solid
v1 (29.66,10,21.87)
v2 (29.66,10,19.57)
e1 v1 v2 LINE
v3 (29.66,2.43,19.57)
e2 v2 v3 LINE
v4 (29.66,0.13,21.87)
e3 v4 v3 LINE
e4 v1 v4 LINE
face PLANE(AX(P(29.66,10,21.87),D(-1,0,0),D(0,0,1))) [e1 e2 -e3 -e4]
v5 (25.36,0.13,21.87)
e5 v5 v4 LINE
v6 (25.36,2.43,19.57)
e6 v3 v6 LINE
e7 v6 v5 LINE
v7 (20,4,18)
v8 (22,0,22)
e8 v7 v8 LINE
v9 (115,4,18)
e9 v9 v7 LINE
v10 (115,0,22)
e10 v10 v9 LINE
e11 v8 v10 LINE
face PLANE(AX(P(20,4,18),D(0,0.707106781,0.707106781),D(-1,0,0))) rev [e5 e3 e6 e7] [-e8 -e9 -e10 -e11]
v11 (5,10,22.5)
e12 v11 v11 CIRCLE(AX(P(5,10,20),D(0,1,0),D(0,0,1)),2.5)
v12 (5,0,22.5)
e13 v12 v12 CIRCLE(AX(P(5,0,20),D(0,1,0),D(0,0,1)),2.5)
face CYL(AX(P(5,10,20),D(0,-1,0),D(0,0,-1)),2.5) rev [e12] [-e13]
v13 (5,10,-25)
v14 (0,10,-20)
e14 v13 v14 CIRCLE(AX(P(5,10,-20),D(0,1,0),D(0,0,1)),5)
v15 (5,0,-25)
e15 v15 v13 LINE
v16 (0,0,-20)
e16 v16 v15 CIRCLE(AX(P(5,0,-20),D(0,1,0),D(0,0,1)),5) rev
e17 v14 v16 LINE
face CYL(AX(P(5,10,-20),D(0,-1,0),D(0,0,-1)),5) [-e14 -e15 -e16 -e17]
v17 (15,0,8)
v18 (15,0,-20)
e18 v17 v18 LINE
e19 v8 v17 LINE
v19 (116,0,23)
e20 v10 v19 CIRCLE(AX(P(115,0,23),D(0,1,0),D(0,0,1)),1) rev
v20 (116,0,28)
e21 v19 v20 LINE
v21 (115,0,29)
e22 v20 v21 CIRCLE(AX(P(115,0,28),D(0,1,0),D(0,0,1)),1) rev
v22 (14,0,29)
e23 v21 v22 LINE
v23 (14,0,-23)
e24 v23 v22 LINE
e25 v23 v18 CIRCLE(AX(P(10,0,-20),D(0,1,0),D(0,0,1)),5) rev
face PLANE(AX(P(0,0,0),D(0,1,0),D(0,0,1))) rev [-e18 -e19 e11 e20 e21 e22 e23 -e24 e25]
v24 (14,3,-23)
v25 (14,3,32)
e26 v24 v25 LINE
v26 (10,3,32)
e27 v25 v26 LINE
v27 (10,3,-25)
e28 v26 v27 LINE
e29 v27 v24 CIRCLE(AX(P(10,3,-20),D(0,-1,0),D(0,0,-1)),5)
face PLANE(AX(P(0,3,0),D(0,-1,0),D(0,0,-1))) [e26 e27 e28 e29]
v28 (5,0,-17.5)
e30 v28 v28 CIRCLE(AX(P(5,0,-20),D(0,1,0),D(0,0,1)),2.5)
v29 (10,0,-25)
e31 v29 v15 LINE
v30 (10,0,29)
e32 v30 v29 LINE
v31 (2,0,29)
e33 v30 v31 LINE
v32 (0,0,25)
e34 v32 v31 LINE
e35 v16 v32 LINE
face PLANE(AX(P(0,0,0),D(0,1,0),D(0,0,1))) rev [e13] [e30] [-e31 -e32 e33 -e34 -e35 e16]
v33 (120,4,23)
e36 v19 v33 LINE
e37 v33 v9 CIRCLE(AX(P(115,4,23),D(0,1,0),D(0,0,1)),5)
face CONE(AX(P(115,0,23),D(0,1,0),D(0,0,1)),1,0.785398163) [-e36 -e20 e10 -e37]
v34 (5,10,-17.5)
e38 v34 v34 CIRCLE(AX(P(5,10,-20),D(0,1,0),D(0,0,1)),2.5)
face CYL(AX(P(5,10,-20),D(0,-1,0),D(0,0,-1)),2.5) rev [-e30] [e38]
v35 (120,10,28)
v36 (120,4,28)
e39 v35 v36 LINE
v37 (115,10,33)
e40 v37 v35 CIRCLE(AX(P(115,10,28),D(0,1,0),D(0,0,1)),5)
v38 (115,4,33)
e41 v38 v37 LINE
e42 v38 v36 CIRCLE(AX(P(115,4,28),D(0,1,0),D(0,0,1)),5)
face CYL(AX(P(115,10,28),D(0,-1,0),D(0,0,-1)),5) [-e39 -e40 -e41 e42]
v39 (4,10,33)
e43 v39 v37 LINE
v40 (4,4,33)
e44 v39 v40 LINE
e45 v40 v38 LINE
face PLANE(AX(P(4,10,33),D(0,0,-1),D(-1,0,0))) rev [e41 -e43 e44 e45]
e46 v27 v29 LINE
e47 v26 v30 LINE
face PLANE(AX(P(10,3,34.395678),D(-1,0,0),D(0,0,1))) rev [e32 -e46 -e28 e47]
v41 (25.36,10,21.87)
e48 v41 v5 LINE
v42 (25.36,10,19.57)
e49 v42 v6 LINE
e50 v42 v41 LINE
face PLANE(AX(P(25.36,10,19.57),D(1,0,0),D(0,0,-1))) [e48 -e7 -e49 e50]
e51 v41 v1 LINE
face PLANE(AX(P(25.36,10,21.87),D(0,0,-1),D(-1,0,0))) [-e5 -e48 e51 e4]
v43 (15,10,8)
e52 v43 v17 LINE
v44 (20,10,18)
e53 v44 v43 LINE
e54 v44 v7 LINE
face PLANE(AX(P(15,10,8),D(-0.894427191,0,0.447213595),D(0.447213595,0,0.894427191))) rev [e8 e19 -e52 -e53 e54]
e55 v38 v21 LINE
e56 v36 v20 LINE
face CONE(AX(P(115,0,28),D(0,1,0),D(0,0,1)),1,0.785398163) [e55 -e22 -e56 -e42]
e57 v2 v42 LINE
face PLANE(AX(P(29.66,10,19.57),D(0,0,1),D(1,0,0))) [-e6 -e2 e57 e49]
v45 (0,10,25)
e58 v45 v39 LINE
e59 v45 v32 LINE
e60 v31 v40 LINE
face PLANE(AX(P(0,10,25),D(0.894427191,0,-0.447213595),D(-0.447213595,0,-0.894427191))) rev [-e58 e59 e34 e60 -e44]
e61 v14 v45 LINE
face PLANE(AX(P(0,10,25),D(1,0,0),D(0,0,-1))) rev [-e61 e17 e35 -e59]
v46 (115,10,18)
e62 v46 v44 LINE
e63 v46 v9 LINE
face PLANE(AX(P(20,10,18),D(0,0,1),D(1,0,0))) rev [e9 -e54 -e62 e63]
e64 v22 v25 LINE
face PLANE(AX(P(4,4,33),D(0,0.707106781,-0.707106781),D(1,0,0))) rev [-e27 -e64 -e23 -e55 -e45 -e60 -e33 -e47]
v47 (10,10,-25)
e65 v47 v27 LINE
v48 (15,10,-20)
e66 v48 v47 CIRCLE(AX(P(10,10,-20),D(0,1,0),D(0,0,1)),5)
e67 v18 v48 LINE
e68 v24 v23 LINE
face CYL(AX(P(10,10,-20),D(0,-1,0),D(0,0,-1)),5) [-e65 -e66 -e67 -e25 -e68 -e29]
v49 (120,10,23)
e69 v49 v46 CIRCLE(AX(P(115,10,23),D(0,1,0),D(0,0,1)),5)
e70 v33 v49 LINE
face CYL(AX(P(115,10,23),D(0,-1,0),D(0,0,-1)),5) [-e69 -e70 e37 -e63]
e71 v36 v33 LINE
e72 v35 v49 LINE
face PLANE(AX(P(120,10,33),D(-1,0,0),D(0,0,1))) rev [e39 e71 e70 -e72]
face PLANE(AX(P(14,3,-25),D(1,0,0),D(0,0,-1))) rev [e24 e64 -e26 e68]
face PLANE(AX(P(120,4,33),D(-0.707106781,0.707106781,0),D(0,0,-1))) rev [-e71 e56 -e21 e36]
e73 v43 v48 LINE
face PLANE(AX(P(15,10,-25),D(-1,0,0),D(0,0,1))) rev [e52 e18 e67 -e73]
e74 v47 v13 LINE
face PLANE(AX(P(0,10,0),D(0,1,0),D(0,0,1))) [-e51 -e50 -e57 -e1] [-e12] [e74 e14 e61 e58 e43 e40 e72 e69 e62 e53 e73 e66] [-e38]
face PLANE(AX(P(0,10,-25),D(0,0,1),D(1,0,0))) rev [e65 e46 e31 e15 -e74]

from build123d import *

# Parameters (mm, degrees)
SKETCH1_R           = 2.5
SKETCH1_W           = 4.3
SKETCH1_H           = 2.3
BOSS_EXTRUDE1_DEPTH = 10
SKETCH2_W           = 4
SKETCH2_H           = 59.39567842
CUT_EXTRUDE1_DEPTH  = 3
FILLET3_R           = 5
CHAMFER2_SIZE       = 4


with BuildPart() as part:
    # Sketch1 → Boss-Extrude1 (new body)
    with BuildSketch(Plane(origin=(0, 0, 0), x_dir=(1, 0, 0), z_dir=(0, 1, 0))):
        Polygon((0, -25), (0, 25), (15, 25), (15, -8), (20, -18), (32, -18), (35, -18), (120, -18), (120, -33), (4, -33), align=None)
        with Locations(Location((5, 20, 0), (0, 0, 270))):
            Circle(SKETCH1_R, mode=Mode.SUBTRACT)
        with Locations(Location((5, -20, 0), (0, 0, 270))):
            Circle(SKETCH1_R, mode=Mode.SUBTRACT)
        with Locations((27.51, -20.72)):
            Rectangle(SKETCH1_W, SKETCH1_H, mode=Mode.SUBTRACT)
    extrude(amount=BOSS_EXTRUDE1_DEPTH)

    # Sketch2 → Cut-Extrude1 (cut)
    with BuildSketch(Plane.XZ):
        with Locations((12, 4.69783921)):
            Rectangle(SKETCH2_W, SKETCH2_H)
    extrude(amount=-CUT_EXTRUDE1_DEPTH, mode=Mode.SUBTRACT)

    # Fillet3
    fillet3_edges = [part.edges().sort_by_distance(p)[0] for p in [
        (120, 5, 33),
        (120, 5, 18),
        (0, 5, -25),
        (15, 5, -25),
    ]]
    fillet(fillet3_edges, radius=FILLET3_R)

    # Chamfer2
    # the kernel refuses this chamfer: 4 mm, written as the material it takes off along each edge
    with BuildSketch(Plane(origin=(20.286731952, 0, 33), x_dir=(0, -0.027495876610586365, -0.9996219169112968), z_dir=(-1, 0, 0))) as chamfer2_piece_1:
        Polygon((CHAMFER2_SIZE * 0.999621916911, -CHAMFER2_SIZE * 0.0274958766106), (-CHAMFER2_SIZE * 0.0274958766106, -CHAMFER2_SIZE * 0.999621916911), (0, 0), align=None)
    extrude(amount=26.573463904, mode=Mode.SUBTRACT)
    with BuildSketch(Plane(origin=(115, 0, 33), x_dir=(0, 0.9996219169112968, 0.02749587661058563), z_dir=(-1, 0, 0))) as chamfer2_piece_2:
        Polygon((CHAMFER2_SIZE * 0.999621916911, CHAMFER2_SIZE * 0.0274958766106), (-CHAMFER2_SIZE * 0.0274958766106, CHAMFER2_SIZE * 0.999621916911), (0, 0), align=None)
    extrude(amount=111.286731952, mode=Mode.SUBTRACT)
    with BuildSketch(Plane(origin=(120, 0, 23), x_dir=(0.02749587661058563, 0.9996219169112968, 0), z_dir=(0, 0, 1))) as chamfer2_piece_3:
        Polygon((CHAMFER2_SIZE * 0.999621916911, CHAMFER2_SIZE * 0.0274958766106), (-CHAMFER2_SIZE * 0.0274958766106, CHAMFER2_SIZE * 0.999621916911), (0, 0), align=None)
    extrude(amount=5, mode=Mode.SUBTRACT)
    with BuildSketch(Plane(origin=(115, 0, 18), x_dir=(0, 0.999621916911297, -0.02749587661058045), z_dir=(-1, 0, 0))) as chamfer2_piece_4_section:
        Polygon((CHAMFER2_SIZE * 0.999621916911, -CHAMFER2_SIZE * 0.0274958766106), (-CHAMFER2_SIZE * 0.0274958766106, -CHAMFER2_SIZE * 0.999621916911), (0, 0), align=None)
    chamfer2_piece_4 = extrude(amount=105.286731952, mode=Mode.PRIVATE)
    chamfer2_piece_4 = split(chamfer2_piece_4, bisect_by=Plane(origin=(30.091205291, 1.322053336, 38.182410583), z_dir=(0.8944271909999159, 0, -0.4472135954999581)), keep=Keep.TOP, mode=Mode.PRIVATE)
    add(chamfer2_piece_4, mode=Mode.SUBTRACT)
    with BuildSketch(Plane(origin=(115, 0, 23), x_dir=(0, 0, -1), z_dir=(-1, 0, 0))) as chamfer2_piece_5:
        Polygon((5, -CHAMFER2_SIZE), (5 - CHAMFER2_SIZE, 0), (5, 0), align=None)
    revolve(axis=Axis((115, 0, 23), (0, -1, 0)), revolution_arc=90, mode=Mode.SUBTRACT)
    with BuildSketch(Plane(origin=(115, 0, 28), x_dir=(0, 0, 1), z_dir=(-1, 0, 0))) as chamfer2_piece_6:
        Polygon((5, CHAMFER2_SIZE), (5 - CHAMFER2_SIZE, 0), (5, 0), align=None)
    revolve(axis=Axis((115, 0, 28), (0, 1, 0)), revolution_arc=90, mode=Mode.SUBTRACT)


solid = part.part
